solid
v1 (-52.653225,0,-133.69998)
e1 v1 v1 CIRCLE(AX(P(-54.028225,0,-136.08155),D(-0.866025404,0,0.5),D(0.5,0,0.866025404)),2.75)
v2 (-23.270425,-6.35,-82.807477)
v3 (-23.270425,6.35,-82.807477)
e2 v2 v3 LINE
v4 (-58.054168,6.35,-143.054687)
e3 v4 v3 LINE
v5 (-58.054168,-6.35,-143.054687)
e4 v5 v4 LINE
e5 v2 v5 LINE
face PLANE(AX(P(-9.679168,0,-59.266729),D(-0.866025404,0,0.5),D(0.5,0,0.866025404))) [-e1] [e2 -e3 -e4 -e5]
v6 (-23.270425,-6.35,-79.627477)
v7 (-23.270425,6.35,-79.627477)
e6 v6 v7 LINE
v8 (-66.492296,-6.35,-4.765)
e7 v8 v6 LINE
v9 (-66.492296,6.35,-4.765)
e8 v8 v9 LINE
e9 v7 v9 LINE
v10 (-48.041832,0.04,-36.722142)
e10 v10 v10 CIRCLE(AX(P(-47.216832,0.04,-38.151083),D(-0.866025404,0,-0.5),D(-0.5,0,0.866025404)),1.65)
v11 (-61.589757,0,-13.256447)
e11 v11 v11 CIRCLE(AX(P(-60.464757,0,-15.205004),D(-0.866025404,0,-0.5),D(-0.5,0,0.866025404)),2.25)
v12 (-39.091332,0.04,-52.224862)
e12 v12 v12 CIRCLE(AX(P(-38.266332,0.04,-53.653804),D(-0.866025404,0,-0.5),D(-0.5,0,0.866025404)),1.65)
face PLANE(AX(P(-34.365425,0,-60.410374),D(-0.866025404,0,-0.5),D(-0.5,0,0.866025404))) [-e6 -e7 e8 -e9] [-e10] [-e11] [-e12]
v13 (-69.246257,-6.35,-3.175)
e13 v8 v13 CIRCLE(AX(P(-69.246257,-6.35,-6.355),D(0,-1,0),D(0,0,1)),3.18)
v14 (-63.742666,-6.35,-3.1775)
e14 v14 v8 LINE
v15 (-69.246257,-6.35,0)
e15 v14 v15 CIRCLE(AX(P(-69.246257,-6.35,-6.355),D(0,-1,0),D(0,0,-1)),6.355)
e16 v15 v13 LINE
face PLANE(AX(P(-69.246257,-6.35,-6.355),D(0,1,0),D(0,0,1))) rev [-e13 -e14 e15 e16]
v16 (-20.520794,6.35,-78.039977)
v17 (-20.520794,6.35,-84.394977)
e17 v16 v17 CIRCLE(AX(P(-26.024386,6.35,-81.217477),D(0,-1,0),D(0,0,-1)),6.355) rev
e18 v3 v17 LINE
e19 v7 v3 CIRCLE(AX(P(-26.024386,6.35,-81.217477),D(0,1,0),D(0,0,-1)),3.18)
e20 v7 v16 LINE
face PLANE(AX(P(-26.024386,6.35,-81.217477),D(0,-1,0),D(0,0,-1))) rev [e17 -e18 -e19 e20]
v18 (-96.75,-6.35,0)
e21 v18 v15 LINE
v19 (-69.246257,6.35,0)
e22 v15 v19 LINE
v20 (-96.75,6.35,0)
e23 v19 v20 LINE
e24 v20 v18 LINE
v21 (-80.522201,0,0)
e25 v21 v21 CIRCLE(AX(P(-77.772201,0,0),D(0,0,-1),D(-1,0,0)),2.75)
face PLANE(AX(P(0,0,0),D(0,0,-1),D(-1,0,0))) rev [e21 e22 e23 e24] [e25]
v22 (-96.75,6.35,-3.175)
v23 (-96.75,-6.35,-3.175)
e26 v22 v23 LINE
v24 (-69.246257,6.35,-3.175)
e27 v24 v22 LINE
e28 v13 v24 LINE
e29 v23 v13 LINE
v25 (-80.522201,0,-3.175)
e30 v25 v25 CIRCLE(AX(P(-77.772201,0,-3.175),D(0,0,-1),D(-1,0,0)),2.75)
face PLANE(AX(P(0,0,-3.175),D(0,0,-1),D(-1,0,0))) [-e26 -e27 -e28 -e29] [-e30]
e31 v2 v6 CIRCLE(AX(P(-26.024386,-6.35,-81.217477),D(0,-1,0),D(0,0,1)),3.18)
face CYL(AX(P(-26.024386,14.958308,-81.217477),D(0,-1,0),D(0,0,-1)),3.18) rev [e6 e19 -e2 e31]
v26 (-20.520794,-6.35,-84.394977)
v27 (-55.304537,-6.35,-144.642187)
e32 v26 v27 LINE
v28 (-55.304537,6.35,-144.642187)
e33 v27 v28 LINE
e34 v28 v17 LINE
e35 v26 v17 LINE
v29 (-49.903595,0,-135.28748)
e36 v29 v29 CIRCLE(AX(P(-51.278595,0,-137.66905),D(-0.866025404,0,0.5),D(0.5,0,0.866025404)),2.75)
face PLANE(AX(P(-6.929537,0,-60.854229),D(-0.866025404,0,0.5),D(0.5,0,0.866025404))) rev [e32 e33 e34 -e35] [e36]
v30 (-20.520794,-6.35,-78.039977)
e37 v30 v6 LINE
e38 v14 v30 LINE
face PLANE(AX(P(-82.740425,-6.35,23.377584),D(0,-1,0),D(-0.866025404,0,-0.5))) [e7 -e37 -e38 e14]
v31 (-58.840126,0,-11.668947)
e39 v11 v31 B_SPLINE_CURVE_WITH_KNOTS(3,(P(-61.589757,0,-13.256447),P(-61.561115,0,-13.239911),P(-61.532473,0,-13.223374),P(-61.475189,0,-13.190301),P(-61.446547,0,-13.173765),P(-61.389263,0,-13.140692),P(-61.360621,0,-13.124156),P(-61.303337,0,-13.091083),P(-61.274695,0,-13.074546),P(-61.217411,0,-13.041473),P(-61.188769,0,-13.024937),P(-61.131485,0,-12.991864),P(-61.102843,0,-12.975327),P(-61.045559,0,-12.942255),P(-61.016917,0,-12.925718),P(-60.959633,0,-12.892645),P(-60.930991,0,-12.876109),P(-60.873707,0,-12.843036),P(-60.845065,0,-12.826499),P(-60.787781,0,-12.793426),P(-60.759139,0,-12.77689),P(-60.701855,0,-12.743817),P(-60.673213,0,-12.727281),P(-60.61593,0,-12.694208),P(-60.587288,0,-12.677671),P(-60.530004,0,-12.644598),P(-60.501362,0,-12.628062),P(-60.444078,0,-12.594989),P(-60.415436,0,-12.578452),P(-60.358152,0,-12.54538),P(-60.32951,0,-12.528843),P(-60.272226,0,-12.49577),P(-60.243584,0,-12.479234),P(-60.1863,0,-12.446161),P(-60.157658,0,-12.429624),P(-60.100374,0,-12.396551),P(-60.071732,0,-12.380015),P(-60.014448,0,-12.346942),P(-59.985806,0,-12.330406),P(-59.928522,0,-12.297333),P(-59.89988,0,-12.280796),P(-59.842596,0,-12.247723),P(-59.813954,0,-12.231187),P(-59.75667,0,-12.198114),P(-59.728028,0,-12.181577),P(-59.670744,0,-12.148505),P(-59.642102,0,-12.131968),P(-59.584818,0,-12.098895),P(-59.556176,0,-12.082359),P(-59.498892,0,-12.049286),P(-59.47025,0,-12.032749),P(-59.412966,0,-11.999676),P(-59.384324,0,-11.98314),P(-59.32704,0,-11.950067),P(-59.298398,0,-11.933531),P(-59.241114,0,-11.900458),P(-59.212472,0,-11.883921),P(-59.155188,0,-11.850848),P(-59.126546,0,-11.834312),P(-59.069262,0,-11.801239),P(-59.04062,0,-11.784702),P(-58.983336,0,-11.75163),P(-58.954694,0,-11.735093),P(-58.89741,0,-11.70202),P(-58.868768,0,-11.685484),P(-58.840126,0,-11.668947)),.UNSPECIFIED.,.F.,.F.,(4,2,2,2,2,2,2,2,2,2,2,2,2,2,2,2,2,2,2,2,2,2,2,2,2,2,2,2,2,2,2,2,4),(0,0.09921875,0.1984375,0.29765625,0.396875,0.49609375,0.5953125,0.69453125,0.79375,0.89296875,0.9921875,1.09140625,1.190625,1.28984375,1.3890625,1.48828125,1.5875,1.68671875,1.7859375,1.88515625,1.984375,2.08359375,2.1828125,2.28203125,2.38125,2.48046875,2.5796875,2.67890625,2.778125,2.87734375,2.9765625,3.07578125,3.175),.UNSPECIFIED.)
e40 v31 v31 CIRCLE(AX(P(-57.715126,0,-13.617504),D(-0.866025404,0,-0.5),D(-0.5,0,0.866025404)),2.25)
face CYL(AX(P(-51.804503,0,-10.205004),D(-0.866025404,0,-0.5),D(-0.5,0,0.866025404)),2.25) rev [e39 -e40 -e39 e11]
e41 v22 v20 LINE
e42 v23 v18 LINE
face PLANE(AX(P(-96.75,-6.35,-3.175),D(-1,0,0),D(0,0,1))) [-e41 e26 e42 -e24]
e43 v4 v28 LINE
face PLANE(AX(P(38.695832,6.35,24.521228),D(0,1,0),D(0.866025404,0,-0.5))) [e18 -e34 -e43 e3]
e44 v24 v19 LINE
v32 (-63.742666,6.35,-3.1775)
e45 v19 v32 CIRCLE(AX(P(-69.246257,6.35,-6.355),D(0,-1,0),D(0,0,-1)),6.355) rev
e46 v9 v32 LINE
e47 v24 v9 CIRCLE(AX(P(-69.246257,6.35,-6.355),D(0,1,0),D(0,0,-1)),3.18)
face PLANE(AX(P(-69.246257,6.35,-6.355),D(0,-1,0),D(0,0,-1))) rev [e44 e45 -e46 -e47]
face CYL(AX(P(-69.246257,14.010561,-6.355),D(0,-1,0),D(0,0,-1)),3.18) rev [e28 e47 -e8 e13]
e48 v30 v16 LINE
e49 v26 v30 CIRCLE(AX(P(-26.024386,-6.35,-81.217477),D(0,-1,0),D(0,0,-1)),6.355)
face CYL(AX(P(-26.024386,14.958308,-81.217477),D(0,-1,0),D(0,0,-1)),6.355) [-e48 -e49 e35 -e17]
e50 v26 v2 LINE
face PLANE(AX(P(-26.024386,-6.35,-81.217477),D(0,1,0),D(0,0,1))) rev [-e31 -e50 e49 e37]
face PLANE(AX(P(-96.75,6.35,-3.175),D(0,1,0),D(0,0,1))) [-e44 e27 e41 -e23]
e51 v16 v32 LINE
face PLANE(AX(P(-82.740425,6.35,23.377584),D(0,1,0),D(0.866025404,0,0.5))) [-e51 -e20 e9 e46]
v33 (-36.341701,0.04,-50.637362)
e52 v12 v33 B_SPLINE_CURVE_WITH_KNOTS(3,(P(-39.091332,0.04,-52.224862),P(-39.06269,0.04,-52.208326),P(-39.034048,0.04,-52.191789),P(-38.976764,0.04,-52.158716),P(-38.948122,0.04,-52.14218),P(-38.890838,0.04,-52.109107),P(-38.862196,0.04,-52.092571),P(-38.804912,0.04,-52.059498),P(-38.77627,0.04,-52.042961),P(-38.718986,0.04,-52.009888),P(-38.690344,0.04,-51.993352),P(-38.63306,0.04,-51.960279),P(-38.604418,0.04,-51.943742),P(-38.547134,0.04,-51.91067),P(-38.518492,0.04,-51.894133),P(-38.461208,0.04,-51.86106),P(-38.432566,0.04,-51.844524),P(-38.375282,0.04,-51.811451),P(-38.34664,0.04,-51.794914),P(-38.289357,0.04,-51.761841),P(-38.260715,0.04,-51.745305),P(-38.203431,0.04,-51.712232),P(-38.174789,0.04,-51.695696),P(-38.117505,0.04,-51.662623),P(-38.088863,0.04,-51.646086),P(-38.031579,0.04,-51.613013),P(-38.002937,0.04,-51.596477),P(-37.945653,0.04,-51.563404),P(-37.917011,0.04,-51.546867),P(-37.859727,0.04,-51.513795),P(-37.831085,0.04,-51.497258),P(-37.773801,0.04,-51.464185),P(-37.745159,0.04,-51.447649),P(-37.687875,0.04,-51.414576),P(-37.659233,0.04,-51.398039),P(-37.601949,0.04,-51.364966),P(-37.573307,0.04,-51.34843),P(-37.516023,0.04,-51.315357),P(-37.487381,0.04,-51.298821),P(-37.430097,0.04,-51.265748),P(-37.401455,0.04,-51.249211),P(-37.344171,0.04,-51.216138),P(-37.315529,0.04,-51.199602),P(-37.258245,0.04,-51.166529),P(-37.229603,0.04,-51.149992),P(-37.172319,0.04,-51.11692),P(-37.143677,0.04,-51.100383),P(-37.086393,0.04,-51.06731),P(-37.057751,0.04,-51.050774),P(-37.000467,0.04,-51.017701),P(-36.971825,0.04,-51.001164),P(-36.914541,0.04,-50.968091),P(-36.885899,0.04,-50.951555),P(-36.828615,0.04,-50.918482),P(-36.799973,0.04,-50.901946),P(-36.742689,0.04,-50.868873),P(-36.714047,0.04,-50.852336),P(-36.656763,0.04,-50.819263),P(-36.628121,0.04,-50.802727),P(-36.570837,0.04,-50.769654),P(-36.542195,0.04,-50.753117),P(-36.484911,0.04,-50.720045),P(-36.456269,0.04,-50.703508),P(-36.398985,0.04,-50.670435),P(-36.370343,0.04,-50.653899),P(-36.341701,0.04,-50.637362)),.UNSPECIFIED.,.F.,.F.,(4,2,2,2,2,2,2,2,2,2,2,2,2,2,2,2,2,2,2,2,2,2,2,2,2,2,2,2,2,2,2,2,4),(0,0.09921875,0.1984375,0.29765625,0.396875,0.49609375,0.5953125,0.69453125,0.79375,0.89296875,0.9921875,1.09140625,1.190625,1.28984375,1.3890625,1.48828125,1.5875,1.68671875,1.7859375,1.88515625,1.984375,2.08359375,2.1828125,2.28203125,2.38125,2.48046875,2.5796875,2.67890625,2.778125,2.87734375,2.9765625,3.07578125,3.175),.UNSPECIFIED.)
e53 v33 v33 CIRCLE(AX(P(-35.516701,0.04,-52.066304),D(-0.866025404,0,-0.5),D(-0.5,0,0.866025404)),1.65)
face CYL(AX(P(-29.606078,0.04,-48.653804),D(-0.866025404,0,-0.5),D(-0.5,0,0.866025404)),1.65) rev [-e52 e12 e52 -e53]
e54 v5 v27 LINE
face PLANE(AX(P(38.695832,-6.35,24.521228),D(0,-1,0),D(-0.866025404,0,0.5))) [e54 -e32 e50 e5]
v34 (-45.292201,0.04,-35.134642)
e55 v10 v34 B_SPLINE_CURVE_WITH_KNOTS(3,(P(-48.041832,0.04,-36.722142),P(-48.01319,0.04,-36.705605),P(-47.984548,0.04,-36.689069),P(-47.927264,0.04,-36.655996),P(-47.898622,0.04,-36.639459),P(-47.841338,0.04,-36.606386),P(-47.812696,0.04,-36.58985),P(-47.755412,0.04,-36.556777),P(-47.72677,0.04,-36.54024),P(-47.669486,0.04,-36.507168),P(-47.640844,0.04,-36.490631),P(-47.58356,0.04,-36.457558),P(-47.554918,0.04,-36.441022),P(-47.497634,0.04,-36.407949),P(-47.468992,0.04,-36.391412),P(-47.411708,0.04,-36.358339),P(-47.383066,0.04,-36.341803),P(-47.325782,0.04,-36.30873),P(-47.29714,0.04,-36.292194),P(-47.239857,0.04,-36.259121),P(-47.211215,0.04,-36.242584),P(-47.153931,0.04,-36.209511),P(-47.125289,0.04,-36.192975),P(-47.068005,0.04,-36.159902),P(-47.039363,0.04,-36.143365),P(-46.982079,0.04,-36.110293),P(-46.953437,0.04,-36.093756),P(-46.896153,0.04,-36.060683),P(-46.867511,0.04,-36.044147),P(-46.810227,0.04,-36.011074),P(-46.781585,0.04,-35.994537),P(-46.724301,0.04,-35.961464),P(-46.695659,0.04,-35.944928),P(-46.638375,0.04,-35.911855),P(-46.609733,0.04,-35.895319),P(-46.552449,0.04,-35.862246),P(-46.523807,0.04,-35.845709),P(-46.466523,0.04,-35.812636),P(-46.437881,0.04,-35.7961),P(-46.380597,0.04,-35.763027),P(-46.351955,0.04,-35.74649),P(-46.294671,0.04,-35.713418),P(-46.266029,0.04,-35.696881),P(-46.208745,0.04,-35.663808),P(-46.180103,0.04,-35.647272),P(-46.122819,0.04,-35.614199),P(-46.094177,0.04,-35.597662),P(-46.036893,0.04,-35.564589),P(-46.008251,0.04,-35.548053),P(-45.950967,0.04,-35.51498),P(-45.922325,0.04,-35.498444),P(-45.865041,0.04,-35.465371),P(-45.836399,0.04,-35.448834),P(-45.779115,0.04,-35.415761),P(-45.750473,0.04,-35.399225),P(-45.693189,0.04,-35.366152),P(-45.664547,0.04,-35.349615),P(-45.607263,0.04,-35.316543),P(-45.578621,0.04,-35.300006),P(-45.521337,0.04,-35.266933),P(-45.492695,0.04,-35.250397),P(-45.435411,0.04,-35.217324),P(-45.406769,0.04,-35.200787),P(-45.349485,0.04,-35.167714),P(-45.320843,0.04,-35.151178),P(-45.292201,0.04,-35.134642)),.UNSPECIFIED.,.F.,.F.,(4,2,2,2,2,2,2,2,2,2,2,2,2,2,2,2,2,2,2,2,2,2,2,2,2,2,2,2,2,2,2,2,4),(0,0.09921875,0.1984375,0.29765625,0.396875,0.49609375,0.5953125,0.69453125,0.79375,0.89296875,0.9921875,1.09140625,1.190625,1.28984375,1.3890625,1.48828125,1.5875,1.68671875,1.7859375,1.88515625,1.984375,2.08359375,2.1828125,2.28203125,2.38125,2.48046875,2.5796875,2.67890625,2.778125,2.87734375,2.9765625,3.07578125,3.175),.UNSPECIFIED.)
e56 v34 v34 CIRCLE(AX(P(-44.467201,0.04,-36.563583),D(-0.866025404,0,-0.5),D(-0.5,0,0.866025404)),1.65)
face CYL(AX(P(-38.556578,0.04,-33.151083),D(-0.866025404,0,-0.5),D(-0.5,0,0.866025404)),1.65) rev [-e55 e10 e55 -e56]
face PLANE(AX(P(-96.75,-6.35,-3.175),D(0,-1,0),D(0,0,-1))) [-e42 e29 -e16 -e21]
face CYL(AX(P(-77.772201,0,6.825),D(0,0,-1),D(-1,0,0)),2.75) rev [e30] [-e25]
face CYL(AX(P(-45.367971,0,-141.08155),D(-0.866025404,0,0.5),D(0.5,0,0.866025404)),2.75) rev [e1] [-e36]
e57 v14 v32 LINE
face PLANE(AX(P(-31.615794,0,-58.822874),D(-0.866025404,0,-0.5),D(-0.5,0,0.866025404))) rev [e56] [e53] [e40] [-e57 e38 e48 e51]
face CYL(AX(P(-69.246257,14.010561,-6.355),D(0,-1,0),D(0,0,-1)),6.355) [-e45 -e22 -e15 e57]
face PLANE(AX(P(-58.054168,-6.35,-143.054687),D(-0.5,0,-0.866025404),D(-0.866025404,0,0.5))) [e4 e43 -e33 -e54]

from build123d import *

# Parameters (mm, degrees)
ESBO_O2_W               = 193.5
ESBO_O2_H               = 12.7
FLANGE_BASE1_DEPTH      = 3.175
DOBRA_START             = -6.35
DOBRA_ESBO_ADA1_DEPTH   = 12.7
DOBRA_ESBO_ADA1_2_DEPTH = 12.7
DOBRA_ESBO_ADA2_DEPTH   = 12.7
DOBRA_ESBO_ADA2_2_DEPTH = 12.7
ESBO_O10_R              = 2.75
CORTE_EXTRUS_O2_DEPTH   = 10
ESBO_O11_R              = 2.75
CORTE_EXTRUS_O3_DEPTH   = 10
ESBO_O12_R              = 1.65
ESBO_O12_R_2            = 2.250000002
CORTE_EXTRUS_O4_DEPTH   = 10


# Read off the part's stored shape, not the designer's step: Dobra esboçada1, Dobra esboçada2
# Sheet-metal steps are written as plain solids
with BuildPart() as part:
    # Esboço2 → Flange-base1 (new body)
    with BuildSketch(Plane.XY):
        Rectangle(ESBO_O2_W, ESBO_O2_H)
    extrude(amount=-FLANGE_BASE1_DEPTH)

    # Dobra esboçada1 outline → Dobra esboçada1 (cut)
    with BuildSketch(Plane(origin=(0, 0, 0), x_dir=(1, 0, 0), z_dir=(0, 1, 0)).offset(DOBRA_START)):
        with BuildLine():
            Line((96.75, 3.175), (-63.744109855, 3.175))
            ThreePointArc((-63.744109855, 3.175), (-66.070007409, 0.850686918), (-69.246257163, 0))
            Line((-69.246257163, 0), (96.75, 0))
            Line((96.75, 0), (96.75, 3.175))
        make_face()
    extrude(amount=DOBRA_ESBO_ADA1_DEPTH, mode=Mode.SUBTRACT)

    # Dobra esbo_ada1 2 outline → Dobra esbo_ada1 2 (add)
    with BuildSketch(Plane(origin=(0, 0, 0), x_dir=(1, 0, 0), z_dir=(0, 1, 0)).offset(DOBRA_START)):
        with BuildLine():
            Line((16.759205697, 142.610831402), (14.00957504, 144.198331402))
            Line((14.00957504, 144.198331402), (-66.492296379, 4.765))
            ThreePointArc((-66.492296379, 4.765), (-67.656257163, 3.601039216), (-69.246257163, 3.175))
            Line((-69.246257163, 3.175), (-63.744109855, 3.175))
            ThreePointArc((-63.744109855, 3.175), (-63.743387647, 3.176249918), (-63.742665722, 3.1775))
            Line((-63.742665722, 3.1775), (16.759205697, 142.610831402))
        make_face()
    extrude(amount=DOBRA_ESBO_ADA1_2_DEPTH)

    # Dobra esboçada2 outline → Dobra esboçada2 (cut)
    with BuildSketch(Plane(origin=(0, 0, 0), x_dir=(1, 0, 0), z_dir=(0, 1, 0)).offset(DOBRA_START)):
        with BuildLine():
            Line((14.00957504, 144.198331402), (-20.519351306, 84.39247664))
            ThreePointArc((-20.519351306, 84.39247664), (-19.669385908, 81.21603373), (-20.520794303, 78.039977295))
            Line((-20.520794303, 78.039977295), (16.759205697, 142.610831402))
            Line((16.759205697, 142.610831402), (14.00957504, 144.198331402))
        make_face()
    extrude(amount=DOBRA_ESBO_ADA2_DEPTH, mode=Mode.SUBTRACT)

    # Dobra esbo_ada2 2 outline → Dobra esbo_ada2 2 (add)
    with BuildSketch(Plane(origin=(0, 0, 0), x_dir=(1, 0, 0), z_dir=(0, 1, 0)).offset(DOBRA_START)):
        with BuildLine():
            Line((-58.054167797, 143.054687167), (-23.27042496, 82.807477295))
            ThreePointArc((-23.27042496, 82.807477295), (-22.844385744, 81.217477295), (-23.27042496, 79.627477295))
            Line((-23.27042496, 79.627477295), (-20.519351306, 84.39247664))
            ThreePointArc((-20.519351306, 84.39247664), (-20.520072663, 84.393727049), (-20.520794303, 84.394977295))
            Line((-20.520794303, 84.394977295), (-55.30453714, 144.642187167))
            Line((-55.30453714, 144.642187167), (-58.054167797, 143.054687167))
        make_face()
    extrude(amount=DOBRA_ESBO_ADA2_2_DEPTH)

    # Esboço10 → Corte-extrusão2 (cut)
    with BuildSketch(Plane(origin=(18.403870761, 0, -10.625479738), x_dir=(0.5000000000000041, 0, 0.8660254037844364), z_dir=(-0.8660254037844363, 0, 0.500000000000004))):
        with Locations((-144.864192108, 0)):
            Circle(ESBO_O10_R)
    extrude(amount=-CORTE_EXTRUS_O2_DEPTH, mode=Mode.SUBTRACT)

    # Esboço11 → Corte-extrusão3 (cut)
    with BuildSketch(Plane(origin=(0, 0, -3.175), x_dir=(-1, 0, 0), z_dir=(0, 0, -1))):
        with Locations((77.77220064, 0)):
            Circle(ESBO_O11_R)
    extrude(amount=-CORTE_EXTRUS_O3_DEPTH, mode=Mode.SUBTRACT)

    # Esboço12 → Corte-extrusão4 (cut)
    with BuildSketch(Plane(origin=(-51.932527808, 0, -29.98325891), x_dir=(-0.49999999999999806, 0, 0.8660254037844398), z_dir=(-0.8660254037844397, 0, -0.499999999999998))):
        with Locations((-27.332391374, 0.04)):
            Circle(ESBO_O12_R)
        with Locations((17.064458437, 0)):
            Circle(ESBO_O12_R_2)
        with Locations((-9.431391374, 0.04)):
            Circle(ESBO_O12_R)
    extrude(amount=-CORTE_EXTRUS_O4_DEPTH, mode=Mode.SUBTRACT)


solid = part.part
